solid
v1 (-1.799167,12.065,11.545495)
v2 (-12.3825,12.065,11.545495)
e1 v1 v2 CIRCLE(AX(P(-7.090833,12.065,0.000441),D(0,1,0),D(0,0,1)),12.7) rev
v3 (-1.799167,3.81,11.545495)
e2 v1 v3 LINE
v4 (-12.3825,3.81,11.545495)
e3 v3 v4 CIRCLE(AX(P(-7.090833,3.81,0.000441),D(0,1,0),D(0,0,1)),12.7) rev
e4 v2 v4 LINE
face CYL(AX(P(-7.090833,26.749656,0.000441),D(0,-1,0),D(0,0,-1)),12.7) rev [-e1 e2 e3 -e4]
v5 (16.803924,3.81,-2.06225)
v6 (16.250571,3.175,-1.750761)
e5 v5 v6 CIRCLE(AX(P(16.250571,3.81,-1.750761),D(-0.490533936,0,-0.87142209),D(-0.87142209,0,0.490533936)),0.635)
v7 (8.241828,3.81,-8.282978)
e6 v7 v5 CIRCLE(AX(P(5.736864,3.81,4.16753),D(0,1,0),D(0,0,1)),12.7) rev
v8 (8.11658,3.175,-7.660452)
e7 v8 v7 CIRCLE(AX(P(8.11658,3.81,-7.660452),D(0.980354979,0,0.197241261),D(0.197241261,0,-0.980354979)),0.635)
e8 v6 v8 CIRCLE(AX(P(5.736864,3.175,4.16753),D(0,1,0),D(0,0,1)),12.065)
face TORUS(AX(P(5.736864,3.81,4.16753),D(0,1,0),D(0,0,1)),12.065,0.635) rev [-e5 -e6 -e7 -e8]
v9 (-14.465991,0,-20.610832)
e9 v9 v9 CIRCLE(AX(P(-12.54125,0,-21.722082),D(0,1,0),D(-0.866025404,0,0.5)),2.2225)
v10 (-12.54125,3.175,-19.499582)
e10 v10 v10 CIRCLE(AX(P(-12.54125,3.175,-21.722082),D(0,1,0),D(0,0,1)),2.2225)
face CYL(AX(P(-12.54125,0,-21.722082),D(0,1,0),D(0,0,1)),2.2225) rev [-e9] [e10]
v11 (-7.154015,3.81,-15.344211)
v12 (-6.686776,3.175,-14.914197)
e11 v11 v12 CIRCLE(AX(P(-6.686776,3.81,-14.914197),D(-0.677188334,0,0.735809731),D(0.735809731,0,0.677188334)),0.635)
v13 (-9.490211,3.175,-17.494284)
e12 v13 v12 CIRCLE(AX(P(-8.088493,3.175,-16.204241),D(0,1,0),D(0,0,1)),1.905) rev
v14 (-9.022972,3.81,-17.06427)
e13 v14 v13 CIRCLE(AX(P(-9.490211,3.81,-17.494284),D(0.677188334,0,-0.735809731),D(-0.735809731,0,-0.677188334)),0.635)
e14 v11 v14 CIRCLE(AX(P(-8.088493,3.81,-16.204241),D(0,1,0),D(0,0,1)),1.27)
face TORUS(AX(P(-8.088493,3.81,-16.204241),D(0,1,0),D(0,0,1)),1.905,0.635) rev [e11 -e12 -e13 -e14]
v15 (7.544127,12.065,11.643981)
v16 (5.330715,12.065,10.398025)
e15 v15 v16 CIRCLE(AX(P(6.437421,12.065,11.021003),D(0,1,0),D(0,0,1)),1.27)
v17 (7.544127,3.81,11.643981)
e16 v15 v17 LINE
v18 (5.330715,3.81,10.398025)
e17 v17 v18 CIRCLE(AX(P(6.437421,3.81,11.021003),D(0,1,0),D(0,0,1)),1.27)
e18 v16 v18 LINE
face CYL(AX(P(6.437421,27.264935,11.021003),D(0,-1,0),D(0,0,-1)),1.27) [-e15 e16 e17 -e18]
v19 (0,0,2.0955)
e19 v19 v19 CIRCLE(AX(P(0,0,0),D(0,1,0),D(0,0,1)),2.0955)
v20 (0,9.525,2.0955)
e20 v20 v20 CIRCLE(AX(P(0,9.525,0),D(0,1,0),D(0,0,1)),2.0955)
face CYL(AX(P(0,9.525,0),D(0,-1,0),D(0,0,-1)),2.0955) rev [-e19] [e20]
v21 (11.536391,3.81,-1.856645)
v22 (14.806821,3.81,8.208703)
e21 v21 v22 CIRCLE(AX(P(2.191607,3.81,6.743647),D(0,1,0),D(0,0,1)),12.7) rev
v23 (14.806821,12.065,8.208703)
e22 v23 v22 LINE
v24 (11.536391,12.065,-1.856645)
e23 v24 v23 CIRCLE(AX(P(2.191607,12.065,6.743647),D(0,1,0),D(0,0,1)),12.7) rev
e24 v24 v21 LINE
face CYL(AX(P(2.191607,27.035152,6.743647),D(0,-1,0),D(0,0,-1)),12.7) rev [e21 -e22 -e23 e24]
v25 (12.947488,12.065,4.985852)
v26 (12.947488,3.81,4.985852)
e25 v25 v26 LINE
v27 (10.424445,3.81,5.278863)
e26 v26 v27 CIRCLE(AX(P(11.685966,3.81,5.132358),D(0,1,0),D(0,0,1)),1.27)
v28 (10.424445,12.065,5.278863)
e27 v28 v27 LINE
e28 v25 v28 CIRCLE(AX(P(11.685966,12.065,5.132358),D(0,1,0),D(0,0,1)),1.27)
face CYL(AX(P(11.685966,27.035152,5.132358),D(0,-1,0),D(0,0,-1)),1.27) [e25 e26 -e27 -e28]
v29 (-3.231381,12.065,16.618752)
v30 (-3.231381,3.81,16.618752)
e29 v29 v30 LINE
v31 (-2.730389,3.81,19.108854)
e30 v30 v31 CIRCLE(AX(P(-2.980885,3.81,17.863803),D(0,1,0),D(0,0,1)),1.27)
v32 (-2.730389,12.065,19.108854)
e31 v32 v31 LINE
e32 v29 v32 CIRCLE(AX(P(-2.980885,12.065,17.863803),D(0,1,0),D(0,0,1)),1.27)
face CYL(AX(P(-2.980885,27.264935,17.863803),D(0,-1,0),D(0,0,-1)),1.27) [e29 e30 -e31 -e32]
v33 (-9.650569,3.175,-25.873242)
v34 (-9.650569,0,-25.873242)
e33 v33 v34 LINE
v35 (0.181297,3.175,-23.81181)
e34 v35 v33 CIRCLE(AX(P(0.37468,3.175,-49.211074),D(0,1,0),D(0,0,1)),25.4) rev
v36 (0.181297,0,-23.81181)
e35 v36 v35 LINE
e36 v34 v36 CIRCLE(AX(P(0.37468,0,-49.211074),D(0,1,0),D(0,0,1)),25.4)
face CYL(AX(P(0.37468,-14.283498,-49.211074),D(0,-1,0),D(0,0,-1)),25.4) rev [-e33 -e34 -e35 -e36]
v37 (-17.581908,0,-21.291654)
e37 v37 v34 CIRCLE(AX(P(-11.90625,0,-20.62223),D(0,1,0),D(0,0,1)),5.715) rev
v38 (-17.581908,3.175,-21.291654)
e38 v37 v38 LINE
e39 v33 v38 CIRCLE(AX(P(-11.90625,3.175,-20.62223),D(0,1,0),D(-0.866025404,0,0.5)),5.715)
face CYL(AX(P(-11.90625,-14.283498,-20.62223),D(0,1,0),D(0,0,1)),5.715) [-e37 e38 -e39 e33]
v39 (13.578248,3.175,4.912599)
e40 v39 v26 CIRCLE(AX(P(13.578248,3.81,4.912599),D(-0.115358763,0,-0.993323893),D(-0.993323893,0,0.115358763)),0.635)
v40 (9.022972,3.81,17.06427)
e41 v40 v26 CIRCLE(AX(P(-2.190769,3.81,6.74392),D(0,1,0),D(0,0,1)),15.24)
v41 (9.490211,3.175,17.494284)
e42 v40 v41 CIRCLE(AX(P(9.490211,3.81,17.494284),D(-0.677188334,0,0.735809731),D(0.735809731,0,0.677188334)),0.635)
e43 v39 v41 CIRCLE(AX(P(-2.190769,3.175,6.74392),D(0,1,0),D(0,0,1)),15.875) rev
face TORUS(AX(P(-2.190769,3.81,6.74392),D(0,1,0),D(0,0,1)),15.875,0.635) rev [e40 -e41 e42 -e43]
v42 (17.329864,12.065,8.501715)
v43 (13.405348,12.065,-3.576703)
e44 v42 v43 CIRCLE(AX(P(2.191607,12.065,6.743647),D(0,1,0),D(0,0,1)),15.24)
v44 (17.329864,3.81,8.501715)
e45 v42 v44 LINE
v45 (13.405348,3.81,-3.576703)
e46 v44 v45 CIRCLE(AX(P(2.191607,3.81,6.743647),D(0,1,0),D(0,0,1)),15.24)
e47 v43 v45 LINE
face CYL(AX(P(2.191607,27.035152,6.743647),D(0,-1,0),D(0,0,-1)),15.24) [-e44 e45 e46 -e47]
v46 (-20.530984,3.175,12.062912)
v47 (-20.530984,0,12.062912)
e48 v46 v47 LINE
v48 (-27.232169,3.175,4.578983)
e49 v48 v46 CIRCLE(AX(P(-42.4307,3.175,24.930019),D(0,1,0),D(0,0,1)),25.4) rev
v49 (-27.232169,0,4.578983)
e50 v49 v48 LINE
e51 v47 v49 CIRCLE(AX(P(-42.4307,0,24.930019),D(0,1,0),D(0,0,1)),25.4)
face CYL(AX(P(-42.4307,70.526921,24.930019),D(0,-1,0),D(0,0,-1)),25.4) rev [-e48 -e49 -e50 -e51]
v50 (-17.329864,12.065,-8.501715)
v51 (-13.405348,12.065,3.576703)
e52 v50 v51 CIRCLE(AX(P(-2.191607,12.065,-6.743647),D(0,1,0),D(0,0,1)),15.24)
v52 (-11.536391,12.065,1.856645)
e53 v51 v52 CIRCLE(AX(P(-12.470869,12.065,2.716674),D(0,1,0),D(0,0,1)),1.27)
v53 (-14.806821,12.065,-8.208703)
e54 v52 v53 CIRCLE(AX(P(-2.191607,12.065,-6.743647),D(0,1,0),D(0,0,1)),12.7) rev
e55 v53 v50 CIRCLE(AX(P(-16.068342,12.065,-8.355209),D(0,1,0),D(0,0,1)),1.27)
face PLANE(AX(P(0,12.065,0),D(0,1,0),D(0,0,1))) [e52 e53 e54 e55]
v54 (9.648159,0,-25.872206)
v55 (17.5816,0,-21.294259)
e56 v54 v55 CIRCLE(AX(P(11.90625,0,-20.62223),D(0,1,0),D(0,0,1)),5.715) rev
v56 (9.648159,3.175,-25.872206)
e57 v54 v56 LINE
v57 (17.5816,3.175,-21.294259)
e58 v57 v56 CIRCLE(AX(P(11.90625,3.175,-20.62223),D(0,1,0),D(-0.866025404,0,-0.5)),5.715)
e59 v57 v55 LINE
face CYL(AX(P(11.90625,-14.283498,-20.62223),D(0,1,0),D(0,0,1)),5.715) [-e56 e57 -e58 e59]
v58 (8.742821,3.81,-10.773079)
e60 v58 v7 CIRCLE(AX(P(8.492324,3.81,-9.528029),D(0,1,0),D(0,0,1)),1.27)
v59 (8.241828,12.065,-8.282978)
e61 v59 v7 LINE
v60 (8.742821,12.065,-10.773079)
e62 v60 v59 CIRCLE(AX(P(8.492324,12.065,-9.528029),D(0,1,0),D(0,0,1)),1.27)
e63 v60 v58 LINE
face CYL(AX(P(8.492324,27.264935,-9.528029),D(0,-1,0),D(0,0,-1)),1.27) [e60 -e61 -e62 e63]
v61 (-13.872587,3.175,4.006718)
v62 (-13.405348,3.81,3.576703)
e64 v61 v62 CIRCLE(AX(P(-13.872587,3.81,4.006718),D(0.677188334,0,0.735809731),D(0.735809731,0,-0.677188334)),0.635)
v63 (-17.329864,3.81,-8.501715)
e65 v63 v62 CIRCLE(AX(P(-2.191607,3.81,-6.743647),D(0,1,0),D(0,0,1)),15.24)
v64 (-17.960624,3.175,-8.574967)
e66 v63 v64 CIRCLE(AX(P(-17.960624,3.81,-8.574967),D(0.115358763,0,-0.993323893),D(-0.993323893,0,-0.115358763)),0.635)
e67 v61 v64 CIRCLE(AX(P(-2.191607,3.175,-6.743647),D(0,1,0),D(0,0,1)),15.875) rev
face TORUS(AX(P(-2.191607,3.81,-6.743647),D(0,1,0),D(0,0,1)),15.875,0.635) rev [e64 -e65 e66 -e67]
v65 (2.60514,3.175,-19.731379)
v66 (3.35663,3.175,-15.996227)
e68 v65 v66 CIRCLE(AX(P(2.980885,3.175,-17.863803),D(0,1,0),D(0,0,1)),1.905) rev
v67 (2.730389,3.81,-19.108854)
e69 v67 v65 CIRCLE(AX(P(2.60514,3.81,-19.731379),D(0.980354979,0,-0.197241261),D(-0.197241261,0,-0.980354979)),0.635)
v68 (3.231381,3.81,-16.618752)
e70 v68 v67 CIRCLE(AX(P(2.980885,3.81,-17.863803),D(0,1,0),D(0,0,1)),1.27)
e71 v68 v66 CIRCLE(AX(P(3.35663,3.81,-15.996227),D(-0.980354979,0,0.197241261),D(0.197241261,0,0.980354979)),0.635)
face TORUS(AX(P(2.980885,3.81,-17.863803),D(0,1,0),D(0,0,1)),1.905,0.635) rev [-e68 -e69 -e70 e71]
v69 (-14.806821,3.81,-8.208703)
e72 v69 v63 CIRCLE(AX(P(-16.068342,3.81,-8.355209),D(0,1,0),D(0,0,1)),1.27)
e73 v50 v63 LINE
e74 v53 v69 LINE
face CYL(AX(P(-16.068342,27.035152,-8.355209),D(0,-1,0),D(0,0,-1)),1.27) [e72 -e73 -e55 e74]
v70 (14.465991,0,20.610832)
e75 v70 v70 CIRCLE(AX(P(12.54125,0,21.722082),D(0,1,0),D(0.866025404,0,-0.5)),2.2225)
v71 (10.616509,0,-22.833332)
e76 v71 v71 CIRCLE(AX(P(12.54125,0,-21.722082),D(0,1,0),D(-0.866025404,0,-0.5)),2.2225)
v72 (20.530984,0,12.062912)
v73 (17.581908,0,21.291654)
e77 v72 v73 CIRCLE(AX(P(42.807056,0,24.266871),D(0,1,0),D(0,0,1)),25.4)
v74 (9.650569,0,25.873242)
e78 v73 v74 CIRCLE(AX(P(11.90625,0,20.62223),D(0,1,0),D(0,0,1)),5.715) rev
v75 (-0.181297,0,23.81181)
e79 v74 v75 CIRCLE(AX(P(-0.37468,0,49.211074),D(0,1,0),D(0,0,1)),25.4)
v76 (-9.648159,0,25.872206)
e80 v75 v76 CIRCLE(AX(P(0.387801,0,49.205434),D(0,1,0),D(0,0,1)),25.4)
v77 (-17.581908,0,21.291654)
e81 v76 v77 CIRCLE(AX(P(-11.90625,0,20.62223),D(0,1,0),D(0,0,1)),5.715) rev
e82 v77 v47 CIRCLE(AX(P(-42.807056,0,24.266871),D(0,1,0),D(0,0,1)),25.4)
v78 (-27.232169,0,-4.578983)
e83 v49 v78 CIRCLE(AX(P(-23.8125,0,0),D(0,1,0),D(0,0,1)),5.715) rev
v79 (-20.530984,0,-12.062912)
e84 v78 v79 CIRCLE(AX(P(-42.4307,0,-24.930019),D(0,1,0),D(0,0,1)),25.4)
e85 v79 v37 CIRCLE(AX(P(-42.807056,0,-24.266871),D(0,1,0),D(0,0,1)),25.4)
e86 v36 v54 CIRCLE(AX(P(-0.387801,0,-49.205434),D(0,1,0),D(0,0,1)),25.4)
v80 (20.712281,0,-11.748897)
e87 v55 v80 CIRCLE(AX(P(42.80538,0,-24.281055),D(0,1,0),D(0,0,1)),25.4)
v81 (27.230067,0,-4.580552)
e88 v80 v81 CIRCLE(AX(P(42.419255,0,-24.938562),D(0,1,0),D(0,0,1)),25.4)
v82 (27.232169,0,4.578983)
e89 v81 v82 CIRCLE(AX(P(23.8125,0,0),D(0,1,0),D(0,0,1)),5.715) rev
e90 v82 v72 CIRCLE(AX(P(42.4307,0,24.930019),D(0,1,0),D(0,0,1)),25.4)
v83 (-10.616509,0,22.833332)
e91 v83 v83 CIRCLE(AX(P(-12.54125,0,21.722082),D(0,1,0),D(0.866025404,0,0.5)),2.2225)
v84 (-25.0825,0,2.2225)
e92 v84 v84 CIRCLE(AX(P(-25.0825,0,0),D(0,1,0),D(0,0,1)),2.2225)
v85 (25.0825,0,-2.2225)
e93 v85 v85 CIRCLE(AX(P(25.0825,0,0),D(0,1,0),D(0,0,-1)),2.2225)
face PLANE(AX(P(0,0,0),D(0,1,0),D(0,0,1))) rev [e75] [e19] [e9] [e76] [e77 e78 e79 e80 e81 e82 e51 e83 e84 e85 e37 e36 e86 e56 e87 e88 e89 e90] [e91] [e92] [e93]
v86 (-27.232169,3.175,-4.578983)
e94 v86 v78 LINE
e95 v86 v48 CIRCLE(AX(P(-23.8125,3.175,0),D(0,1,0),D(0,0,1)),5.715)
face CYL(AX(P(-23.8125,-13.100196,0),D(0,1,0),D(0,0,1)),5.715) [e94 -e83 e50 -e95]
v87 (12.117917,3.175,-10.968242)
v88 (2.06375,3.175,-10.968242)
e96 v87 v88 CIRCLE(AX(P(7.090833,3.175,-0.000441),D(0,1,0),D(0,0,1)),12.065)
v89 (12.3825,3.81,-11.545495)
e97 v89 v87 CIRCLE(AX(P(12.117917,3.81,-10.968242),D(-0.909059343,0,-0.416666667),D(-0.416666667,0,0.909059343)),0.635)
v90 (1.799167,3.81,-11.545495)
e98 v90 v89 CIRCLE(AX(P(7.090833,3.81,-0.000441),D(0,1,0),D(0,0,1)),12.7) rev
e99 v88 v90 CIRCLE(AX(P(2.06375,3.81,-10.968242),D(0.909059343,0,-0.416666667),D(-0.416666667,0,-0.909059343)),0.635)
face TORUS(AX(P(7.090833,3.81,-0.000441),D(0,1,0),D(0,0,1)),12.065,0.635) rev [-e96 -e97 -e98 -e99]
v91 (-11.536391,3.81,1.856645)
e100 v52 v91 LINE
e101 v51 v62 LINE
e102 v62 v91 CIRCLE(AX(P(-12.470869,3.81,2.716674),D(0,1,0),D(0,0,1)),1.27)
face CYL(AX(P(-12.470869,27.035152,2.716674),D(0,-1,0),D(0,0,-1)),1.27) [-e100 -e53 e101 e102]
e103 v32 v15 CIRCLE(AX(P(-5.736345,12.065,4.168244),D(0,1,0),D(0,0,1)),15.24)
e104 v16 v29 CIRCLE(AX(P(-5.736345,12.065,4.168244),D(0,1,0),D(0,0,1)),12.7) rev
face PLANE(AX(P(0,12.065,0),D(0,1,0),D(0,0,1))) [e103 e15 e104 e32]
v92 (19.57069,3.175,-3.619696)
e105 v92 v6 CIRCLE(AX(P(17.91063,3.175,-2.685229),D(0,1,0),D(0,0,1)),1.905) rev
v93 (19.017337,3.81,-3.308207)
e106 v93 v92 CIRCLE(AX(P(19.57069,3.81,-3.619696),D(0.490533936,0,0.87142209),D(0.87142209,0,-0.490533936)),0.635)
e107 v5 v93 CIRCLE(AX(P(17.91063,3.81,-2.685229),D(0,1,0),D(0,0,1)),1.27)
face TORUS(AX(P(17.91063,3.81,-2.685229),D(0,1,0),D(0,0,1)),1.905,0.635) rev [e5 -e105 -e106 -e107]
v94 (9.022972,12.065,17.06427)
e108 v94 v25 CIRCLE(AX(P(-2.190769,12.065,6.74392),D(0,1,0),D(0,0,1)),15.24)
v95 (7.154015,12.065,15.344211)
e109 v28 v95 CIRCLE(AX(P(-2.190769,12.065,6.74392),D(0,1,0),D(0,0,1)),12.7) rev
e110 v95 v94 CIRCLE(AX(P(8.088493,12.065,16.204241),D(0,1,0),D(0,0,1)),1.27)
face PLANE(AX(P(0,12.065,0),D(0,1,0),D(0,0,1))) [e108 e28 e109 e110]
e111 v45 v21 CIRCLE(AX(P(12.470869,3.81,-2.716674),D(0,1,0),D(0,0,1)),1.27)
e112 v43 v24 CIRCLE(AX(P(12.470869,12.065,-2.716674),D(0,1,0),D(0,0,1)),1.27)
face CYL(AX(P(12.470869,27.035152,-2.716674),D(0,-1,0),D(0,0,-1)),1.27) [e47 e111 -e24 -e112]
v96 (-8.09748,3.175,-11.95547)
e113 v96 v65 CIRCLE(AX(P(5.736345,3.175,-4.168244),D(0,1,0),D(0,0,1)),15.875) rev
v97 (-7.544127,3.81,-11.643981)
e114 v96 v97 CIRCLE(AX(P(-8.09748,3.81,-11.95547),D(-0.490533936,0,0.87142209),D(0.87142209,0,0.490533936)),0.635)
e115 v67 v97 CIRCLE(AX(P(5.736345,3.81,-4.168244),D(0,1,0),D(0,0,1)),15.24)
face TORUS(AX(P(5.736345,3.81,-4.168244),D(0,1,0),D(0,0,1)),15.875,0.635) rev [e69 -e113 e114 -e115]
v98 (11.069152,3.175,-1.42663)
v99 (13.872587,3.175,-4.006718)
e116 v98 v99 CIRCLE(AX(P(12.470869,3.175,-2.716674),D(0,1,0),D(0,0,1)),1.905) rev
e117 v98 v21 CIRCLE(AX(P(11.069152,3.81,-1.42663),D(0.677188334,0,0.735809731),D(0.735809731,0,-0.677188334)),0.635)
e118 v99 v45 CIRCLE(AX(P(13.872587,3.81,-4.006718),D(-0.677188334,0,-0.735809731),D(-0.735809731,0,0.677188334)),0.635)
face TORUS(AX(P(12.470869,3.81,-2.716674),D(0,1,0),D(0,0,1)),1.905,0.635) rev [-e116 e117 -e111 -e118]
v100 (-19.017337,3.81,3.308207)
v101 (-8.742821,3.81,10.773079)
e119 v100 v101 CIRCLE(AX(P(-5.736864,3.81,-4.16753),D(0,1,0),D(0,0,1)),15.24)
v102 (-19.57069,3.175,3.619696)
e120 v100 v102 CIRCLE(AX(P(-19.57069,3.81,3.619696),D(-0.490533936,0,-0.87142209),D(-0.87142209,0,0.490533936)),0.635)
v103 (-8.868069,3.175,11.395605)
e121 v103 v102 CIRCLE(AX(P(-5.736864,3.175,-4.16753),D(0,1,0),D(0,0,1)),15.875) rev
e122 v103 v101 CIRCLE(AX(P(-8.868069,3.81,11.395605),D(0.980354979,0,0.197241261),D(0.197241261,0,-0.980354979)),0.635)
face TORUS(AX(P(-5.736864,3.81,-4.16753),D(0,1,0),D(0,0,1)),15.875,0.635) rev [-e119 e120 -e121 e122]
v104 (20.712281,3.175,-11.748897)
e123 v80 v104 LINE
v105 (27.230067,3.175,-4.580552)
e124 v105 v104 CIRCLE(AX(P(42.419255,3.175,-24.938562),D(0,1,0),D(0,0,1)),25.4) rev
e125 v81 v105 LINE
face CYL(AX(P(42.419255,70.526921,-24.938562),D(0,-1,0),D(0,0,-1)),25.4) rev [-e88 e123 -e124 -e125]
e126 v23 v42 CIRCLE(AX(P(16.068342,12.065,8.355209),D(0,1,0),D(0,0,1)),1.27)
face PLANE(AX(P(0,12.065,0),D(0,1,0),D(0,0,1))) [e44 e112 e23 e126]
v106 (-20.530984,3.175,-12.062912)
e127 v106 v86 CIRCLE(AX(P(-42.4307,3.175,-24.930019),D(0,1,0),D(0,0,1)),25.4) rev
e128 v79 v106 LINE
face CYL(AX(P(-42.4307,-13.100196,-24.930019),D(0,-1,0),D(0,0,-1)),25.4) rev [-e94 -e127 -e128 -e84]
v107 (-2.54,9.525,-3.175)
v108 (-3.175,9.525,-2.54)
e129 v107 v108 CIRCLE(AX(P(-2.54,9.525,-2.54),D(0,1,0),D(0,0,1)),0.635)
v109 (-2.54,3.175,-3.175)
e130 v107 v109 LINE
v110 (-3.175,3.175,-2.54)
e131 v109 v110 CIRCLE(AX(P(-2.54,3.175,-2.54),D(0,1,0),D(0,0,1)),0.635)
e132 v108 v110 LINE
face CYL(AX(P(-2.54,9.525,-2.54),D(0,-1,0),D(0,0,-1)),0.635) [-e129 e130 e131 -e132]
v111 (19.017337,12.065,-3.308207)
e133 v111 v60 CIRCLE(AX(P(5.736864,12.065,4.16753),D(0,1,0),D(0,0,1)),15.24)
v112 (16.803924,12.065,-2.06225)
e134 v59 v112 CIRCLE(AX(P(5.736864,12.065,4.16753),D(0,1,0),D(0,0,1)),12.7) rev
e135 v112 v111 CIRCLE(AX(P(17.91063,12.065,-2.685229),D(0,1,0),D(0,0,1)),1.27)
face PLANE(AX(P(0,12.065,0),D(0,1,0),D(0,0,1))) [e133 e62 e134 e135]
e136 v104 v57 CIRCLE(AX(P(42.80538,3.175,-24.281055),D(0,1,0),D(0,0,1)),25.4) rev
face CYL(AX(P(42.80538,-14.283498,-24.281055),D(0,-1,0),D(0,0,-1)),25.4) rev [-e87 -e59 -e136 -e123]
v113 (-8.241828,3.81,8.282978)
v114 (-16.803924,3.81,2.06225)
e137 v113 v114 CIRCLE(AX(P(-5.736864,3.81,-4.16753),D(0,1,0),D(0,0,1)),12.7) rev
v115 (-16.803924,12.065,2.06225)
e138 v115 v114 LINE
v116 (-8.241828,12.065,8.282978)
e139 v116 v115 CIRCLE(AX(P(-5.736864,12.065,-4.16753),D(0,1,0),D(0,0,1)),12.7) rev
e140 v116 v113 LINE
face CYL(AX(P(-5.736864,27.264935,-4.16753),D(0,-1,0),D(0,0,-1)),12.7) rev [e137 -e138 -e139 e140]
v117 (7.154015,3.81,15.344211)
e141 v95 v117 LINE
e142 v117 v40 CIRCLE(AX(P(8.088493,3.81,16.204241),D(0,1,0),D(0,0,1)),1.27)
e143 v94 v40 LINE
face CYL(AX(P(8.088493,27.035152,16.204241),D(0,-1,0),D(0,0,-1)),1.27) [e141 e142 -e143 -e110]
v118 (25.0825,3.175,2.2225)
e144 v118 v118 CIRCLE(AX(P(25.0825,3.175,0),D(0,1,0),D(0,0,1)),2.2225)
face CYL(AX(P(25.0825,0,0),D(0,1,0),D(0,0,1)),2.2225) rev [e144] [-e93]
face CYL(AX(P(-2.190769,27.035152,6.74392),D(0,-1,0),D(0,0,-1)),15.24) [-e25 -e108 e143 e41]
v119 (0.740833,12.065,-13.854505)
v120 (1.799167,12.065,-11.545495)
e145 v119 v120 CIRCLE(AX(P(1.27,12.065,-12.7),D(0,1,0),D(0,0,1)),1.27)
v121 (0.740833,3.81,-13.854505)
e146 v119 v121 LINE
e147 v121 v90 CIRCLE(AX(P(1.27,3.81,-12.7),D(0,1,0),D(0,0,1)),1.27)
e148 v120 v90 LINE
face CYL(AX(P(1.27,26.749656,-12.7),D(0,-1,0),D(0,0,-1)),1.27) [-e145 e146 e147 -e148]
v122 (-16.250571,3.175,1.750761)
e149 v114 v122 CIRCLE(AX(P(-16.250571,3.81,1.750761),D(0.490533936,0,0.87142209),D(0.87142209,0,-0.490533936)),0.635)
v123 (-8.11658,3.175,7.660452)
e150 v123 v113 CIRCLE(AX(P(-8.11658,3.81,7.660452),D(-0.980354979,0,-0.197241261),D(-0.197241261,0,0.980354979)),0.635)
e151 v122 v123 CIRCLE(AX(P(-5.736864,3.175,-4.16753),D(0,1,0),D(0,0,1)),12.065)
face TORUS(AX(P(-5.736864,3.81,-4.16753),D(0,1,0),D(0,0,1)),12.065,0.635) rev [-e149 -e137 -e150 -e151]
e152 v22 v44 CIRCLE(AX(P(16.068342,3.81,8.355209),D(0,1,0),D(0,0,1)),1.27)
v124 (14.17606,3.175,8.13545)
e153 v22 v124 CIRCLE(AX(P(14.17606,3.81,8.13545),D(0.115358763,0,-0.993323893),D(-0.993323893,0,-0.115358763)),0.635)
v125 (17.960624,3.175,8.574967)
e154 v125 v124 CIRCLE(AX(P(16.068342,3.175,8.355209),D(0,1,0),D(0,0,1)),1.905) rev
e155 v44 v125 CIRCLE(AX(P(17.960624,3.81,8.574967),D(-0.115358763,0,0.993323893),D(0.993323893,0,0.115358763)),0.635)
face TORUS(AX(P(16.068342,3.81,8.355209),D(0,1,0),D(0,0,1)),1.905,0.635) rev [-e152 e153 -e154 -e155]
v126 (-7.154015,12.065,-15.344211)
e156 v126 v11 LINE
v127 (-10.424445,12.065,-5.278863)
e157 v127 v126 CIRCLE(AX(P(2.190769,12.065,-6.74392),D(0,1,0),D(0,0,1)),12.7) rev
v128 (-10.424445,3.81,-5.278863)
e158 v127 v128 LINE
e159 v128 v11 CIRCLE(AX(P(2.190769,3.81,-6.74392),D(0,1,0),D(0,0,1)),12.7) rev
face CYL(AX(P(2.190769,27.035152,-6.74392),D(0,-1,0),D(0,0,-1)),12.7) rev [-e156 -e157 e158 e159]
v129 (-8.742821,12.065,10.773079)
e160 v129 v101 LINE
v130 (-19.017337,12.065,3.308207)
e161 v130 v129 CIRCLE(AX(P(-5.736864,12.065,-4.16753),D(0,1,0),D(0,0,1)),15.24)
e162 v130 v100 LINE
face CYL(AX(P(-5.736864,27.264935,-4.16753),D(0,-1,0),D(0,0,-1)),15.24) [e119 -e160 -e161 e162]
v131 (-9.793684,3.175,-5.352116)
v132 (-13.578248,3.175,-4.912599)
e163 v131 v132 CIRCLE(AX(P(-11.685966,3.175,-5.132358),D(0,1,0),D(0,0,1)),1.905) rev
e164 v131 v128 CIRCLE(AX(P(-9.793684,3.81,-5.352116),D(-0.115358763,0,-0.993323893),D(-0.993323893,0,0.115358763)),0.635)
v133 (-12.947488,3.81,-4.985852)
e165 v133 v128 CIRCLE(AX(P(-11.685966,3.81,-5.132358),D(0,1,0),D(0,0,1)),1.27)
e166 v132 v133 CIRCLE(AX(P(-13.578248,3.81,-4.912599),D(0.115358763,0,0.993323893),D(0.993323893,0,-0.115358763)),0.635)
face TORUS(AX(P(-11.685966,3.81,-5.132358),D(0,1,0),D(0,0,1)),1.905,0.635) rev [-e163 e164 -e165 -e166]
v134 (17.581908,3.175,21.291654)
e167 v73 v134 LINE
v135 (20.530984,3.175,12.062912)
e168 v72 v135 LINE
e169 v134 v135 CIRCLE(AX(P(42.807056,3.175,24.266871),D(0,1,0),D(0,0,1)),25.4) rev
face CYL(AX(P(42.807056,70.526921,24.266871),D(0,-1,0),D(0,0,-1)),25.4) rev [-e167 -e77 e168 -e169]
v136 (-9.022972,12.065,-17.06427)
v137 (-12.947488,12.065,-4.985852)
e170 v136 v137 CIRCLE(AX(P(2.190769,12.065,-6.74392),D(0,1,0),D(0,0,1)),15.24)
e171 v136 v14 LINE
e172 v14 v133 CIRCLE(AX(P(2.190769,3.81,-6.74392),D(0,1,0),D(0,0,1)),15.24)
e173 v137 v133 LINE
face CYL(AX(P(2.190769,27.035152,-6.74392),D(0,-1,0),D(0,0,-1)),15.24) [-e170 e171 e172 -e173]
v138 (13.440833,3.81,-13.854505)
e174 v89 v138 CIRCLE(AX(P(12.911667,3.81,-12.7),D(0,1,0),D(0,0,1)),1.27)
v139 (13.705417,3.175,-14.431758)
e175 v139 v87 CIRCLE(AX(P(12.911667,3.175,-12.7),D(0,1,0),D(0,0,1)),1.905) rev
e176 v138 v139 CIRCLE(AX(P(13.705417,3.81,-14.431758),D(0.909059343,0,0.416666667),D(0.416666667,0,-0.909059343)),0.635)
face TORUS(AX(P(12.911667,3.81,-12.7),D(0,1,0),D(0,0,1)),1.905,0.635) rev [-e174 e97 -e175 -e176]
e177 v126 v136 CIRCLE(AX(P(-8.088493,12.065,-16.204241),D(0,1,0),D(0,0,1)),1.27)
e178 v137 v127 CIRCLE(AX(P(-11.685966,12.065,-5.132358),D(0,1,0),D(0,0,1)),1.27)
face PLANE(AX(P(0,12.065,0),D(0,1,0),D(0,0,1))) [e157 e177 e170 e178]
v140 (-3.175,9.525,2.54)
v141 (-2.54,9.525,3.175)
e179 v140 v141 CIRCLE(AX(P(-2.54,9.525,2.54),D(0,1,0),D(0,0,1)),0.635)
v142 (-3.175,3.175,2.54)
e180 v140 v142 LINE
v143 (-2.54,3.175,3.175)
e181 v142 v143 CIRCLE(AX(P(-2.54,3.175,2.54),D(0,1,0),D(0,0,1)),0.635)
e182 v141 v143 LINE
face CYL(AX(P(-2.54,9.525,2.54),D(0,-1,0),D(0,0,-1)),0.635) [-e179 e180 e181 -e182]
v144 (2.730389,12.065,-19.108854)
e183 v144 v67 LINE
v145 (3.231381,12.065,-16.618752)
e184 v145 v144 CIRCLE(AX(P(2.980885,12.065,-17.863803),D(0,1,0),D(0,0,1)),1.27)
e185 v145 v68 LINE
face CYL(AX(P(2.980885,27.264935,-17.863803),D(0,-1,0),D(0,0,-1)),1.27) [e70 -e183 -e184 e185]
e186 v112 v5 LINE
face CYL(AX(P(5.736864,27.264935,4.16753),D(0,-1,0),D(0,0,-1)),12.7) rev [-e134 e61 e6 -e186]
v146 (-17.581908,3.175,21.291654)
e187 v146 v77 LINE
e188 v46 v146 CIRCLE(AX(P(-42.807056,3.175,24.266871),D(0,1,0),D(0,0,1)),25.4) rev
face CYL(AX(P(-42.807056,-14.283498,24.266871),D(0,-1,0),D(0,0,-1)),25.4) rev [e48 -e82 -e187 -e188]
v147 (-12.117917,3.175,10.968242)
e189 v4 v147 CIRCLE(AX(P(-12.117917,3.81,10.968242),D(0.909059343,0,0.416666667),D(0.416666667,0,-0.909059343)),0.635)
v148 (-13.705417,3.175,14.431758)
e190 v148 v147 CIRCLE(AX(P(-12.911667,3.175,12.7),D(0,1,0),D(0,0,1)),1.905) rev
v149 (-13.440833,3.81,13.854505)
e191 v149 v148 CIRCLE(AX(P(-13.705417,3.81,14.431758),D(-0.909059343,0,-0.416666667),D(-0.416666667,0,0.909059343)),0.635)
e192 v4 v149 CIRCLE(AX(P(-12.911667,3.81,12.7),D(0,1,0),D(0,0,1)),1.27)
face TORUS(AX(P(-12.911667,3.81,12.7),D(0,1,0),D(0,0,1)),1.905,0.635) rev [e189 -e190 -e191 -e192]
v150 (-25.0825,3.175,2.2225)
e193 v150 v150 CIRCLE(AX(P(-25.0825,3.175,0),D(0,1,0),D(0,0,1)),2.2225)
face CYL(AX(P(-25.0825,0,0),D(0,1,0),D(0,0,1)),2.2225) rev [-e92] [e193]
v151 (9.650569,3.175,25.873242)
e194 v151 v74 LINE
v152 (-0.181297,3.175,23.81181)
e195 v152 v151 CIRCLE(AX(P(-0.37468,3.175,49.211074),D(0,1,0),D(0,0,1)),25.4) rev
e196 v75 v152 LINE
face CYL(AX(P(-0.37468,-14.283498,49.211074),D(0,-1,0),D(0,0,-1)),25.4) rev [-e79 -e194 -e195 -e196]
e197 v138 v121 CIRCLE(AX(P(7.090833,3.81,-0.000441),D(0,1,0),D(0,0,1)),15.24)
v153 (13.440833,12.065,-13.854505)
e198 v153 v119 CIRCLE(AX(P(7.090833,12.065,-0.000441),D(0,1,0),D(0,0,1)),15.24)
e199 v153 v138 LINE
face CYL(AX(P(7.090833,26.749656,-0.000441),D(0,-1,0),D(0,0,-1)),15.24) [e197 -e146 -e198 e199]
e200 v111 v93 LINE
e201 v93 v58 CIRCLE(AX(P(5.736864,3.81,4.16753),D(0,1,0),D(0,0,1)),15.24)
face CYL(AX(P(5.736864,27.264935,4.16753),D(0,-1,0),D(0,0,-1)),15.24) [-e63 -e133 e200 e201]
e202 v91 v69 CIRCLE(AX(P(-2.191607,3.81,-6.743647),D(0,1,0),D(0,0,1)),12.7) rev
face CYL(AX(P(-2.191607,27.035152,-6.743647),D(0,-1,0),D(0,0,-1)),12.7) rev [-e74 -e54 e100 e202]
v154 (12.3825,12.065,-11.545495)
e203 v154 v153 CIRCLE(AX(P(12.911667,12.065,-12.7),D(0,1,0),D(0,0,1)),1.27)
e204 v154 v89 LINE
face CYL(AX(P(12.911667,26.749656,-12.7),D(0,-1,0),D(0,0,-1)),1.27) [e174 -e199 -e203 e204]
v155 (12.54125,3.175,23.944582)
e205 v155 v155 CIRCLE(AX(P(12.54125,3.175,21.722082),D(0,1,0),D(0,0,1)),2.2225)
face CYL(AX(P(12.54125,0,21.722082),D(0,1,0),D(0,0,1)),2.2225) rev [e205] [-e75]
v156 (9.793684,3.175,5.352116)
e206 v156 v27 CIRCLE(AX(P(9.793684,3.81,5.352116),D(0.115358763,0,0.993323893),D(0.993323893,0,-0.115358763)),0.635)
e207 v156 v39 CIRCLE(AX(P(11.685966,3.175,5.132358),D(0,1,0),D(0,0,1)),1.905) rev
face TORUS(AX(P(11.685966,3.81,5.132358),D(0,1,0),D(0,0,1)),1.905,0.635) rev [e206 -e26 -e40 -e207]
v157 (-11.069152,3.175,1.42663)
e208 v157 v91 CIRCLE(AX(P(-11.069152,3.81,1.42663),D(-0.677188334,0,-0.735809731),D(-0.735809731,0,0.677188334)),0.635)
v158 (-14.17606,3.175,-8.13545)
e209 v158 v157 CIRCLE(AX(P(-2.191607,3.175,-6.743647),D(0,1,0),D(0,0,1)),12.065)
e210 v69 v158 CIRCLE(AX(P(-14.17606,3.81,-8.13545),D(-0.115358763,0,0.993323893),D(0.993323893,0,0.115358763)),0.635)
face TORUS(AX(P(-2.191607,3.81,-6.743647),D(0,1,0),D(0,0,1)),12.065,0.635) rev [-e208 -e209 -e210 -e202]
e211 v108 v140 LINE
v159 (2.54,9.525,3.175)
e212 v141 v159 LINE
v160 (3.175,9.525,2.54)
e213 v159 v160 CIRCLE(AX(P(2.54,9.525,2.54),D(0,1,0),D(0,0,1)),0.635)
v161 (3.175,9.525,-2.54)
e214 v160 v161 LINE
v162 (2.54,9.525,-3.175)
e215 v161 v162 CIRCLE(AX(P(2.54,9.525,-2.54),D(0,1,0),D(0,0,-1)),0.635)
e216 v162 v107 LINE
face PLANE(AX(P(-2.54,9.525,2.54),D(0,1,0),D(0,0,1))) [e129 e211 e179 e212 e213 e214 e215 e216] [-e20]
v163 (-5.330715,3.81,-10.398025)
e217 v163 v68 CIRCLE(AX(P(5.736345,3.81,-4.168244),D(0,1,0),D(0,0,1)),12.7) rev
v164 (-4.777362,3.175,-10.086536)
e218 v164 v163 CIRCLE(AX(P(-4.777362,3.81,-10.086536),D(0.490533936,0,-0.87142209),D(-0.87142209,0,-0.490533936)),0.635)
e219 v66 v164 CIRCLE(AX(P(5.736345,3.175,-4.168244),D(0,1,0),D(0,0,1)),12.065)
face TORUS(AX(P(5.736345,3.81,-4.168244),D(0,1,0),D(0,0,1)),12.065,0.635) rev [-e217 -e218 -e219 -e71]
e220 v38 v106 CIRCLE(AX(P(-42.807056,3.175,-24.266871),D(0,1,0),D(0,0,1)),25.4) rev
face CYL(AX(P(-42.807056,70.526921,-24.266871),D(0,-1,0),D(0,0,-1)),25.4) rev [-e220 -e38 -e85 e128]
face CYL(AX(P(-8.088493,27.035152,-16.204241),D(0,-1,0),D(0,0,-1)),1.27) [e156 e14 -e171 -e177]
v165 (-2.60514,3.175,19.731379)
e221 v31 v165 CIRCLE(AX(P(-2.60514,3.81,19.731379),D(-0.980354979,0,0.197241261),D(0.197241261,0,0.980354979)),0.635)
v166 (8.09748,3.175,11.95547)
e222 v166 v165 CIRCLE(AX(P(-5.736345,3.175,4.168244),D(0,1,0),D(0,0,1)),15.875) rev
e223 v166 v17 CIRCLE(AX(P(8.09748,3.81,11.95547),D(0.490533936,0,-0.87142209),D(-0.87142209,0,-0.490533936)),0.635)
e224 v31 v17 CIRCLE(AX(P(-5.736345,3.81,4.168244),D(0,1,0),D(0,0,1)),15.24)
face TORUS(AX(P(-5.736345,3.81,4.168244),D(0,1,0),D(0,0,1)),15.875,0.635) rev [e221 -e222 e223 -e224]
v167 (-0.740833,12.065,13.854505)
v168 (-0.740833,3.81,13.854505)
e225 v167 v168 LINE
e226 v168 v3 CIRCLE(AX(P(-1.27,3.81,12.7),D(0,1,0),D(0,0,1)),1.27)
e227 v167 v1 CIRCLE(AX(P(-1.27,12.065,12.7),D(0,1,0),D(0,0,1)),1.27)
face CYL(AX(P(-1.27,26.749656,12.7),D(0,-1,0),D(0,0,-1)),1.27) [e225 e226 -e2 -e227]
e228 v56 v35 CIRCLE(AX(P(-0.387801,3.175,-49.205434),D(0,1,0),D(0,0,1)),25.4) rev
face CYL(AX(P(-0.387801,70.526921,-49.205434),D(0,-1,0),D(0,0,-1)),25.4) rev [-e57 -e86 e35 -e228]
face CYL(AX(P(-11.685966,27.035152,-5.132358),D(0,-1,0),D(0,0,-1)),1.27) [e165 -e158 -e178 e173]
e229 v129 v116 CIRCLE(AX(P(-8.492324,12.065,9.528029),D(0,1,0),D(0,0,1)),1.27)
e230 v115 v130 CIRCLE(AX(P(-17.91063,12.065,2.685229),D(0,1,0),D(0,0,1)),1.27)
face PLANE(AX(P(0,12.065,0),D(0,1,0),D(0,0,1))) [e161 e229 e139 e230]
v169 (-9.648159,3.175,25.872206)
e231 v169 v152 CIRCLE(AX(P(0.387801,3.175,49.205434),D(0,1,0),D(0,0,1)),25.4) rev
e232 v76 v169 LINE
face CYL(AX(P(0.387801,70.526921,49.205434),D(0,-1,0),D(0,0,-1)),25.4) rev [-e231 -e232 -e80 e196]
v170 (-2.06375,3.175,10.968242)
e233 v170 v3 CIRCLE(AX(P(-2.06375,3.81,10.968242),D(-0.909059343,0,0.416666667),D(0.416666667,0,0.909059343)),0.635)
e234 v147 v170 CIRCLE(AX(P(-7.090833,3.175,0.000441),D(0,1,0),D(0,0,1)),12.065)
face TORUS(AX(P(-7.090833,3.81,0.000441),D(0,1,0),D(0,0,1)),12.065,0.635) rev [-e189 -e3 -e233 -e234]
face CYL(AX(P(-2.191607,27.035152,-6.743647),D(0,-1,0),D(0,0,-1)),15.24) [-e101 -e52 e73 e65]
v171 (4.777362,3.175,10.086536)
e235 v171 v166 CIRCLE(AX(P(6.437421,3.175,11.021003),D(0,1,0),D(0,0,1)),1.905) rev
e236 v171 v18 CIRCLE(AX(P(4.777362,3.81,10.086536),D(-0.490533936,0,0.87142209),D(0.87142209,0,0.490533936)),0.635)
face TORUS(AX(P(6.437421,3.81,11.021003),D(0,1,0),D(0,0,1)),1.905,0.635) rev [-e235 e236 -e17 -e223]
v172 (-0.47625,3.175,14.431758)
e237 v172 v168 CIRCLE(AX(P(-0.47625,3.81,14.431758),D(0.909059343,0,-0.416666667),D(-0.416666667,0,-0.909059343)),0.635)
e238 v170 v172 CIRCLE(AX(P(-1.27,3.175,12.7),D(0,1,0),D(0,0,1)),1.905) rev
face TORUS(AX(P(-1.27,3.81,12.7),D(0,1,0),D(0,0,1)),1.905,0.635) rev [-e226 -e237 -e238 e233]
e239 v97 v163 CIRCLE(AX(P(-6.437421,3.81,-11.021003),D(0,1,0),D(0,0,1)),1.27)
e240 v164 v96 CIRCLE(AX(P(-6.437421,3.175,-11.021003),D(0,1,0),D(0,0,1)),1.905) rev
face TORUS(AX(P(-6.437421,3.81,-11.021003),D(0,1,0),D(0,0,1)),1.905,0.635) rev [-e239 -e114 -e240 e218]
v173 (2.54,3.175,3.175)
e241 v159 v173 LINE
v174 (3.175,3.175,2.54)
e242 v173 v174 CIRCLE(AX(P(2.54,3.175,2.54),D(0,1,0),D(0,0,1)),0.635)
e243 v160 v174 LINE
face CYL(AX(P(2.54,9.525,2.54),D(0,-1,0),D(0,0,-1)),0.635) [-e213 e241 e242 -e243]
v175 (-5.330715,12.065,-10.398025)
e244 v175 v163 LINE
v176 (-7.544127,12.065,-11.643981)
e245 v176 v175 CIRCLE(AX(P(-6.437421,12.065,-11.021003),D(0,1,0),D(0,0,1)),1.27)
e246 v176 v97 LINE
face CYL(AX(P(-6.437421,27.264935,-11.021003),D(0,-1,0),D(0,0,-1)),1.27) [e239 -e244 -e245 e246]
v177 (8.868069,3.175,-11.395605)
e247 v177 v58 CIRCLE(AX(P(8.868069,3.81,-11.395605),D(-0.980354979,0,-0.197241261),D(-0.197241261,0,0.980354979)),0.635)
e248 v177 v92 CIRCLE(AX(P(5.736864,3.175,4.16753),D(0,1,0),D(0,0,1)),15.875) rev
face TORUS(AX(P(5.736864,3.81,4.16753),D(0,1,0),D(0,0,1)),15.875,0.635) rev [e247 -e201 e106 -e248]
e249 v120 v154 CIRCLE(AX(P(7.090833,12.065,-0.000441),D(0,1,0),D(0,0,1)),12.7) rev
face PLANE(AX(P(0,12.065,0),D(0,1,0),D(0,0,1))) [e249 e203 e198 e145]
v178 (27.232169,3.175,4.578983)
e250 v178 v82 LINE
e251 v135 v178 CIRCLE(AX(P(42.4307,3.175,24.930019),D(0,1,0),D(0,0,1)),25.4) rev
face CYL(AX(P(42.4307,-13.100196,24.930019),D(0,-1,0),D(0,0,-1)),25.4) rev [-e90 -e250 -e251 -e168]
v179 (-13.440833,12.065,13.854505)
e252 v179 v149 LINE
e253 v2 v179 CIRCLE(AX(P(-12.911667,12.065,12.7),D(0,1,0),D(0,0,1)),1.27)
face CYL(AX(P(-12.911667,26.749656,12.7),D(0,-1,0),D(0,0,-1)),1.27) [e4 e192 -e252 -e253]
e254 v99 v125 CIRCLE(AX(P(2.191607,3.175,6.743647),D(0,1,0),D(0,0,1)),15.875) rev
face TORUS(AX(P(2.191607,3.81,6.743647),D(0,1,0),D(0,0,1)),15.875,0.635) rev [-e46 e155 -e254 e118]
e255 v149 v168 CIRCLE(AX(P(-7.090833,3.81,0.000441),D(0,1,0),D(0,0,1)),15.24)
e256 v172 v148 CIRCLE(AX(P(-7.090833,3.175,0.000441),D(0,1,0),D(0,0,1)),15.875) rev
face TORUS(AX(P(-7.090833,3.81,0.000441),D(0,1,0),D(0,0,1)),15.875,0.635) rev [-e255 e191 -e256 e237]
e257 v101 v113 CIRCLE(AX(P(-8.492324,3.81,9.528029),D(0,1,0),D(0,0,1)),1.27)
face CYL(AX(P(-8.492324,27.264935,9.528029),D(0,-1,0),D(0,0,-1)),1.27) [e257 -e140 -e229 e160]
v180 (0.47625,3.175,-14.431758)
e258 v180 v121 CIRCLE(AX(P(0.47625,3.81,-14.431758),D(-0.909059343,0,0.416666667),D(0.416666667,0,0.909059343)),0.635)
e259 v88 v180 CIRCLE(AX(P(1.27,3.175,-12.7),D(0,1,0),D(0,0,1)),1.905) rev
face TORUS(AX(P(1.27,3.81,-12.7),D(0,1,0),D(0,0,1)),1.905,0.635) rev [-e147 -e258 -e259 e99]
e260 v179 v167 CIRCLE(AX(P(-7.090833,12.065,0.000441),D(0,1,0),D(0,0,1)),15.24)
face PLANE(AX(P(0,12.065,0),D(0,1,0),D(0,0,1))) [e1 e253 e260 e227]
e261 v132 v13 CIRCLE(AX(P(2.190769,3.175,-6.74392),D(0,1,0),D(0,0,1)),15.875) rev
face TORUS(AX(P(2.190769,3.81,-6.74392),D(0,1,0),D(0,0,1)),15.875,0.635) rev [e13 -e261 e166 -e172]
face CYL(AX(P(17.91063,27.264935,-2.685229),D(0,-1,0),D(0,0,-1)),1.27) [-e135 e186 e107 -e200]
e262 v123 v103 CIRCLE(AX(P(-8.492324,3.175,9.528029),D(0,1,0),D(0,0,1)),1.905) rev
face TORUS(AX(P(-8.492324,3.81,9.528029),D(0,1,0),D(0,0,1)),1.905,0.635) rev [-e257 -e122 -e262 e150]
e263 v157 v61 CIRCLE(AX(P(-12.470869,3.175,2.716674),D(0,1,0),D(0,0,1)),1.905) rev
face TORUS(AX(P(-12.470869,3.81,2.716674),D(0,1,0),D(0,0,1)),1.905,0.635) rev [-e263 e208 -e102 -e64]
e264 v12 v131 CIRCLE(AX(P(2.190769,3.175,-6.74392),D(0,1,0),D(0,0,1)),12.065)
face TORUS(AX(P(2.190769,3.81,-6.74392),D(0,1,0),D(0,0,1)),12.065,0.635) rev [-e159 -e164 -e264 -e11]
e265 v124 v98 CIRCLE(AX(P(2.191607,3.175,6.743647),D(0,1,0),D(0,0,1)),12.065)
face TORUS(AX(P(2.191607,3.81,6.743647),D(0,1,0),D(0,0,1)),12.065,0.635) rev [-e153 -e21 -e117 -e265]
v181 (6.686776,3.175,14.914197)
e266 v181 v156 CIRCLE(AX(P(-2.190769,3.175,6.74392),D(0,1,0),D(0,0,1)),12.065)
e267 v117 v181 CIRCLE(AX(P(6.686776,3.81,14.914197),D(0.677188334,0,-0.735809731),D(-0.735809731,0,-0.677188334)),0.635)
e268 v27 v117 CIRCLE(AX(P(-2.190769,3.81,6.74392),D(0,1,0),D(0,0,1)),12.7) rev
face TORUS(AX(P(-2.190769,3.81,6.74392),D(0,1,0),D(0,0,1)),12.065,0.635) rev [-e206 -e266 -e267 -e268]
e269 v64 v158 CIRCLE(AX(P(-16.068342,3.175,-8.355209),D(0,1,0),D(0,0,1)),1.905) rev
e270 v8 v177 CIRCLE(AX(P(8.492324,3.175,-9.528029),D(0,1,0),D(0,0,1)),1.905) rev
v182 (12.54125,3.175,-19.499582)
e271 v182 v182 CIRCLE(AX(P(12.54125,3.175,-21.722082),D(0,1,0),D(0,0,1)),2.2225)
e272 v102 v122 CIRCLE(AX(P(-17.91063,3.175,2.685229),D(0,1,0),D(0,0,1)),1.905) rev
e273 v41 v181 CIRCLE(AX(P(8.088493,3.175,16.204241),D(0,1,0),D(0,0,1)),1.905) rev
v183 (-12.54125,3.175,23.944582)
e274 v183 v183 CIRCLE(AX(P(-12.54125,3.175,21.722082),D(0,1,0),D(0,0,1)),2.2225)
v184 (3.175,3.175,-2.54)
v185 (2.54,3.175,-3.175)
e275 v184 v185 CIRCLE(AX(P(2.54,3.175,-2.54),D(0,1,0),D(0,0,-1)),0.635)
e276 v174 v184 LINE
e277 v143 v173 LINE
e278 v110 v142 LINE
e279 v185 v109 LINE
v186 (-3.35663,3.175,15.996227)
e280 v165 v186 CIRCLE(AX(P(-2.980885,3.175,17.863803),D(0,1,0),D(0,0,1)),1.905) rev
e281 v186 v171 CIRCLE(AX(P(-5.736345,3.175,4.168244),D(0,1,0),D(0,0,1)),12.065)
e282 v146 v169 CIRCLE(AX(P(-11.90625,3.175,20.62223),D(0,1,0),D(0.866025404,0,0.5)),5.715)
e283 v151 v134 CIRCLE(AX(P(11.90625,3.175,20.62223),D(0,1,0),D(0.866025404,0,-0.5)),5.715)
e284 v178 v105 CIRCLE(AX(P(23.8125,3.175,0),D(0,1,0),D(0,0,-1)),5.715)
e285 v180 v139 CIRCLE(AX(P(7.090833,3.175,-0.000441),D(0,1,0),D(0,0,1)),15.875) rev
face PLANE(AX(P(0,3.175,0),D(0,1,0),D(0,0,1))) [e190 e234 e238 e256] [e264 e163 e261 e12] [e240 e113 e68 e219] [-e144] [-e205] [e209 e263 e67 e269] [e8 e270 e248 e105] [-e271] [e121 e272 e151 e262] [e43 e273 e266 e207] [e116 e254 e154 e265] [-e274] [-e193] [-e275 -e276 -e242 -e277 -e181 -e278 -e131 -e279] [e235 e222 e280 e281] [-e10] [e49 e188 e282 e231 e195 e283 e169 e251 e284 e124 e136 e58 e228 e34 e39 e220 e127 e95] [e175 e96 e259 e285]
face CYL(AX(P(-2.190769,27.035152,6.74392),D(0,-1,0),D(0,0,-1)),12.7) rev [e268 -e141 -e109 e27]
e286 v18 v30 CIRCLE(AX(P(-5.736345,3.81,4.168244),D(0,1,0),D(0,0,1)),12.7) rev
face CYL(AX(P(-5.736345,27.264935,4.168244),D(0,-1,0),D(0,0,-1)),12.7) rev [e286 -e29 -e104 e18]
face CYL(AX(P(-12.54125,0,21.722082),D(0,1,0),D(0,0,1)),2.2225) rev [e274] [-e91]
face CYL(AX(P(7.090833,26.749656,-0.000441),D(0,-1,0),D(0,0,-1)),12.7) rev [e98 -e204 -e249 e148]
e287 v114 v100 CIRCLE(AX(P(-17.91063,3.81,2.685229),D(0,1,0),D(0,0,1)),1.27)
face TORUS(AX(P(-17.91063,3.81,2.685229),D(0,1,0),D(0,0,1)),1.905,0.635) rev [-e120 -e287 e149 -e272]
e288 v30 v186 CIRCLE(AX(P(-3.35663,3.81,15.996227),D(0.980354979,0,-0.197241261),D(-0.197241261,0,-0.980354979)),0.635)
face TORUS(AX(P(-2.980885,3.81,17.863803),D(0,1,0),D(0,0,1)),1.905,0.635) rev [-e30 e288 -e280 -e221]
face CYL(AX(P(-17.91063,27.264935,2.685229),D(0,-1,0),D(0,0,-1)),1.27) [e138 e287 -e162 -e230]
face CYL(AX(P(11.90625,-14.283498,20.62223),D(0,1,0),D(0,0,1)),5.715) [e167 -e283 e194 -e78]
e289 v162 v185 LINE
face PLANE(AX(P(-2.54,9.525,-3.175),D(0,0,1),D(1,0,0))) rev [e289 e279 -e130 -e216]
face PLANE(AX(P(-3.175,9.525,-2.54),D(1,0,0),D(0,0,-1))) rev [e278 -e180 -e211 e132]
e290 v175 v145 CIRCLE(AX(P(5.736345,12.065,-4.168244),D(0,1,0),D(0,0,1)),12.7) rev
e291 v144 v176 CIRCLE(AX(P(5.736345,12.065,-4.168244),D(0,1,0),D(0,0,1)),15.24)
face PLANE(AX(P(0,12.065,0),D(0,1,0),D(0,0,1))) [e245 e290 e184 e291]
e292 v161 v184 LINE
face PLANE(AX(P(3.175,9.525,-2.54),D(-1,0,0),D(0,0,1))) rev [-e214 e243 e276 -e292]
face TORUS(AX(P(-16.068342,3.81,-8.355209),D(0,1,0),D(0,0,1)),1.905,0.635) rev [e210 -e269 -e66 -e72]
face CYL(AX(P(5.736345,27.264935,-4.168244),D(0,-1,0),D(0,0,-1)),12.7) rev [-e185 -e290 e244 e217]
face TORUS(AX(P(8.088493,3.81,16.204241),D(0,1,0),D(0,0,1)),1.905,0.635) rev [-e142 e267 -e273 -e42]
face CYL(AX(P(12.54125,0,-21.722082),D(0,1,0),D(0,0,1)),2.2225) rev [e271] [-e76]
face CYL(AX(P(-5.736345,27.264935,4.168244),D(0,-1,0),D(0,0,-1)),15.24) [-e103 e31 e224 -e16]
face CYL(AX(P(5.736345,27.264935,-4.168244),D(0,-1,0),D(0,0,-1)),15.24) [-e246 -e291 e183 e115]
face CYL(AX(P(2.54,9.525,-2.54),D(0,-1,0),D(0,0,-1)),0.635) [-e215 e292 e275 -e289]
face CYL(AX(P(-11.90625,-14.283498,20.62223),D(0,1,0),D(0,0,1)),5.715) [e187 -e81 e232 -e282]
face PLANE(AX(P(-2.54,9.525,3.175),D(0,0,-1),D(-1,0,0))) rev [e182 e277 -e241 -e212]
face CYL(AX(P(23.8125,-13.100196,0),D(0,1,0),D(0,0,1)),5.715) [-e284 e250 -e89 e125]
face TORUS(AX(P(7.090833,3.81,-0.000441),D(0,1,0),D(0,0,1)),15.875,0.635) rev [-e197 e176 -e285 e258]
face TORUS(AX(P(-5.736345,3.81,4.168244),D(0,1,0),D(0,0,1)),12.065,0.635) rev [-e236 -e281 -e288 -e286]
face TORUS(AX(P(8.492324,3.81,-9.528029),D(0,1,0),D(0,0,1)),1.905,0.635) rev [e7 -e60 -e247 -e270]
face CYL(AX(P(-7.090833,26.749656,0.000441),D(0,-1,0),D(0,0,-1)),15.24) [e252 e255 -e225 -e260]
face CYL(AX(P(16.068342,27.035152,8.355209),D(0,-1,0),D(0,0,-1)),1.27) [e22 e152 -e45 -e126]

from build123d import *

# Parameters (mm, degrees)
SKETCH1_R                = 20.6375
BOSS_EXTRUDE1_DEPTH      = 3.175
SKETCH2_R                = 23.8125
SKETCH2_R_2              = 20.6375
BOSS_EXTRUDE2_DEPTH      = 3.175
SKETCH4_R                = 2.0955
BOSS_EXTRUDE3_DEPTH      = 6.35
CUT_EXTRUDE1_DEPTH       = 35.269415118
CUT_EXTRUDE1_DEPTH_BACK  = 35.269415118
SKETCH5_R                = 2.0955
BOSS_EXTRUDE4_DEPTH      = 8.89
FILLET1_R                = 0.635
CIRPATTERN1_COUNT        = 10
FILLET1_OF_CIRPATTERN1_R = 0.635
BOSS_EXTRUDE6_START      = -3.175
BOSS_EXTRUDE6_DEPTH      = 3.175
FILLET4_R                = 25.4
SKETCH9_R                = 2.2225
CUT_EXTRUDE2_DEPTH       = 39.960756193
CIRPATTERN3_DEPTH        = 3.175
CIRPATTERN3_2_DEPTH      = 3.175


# Read off the part's stored shape, not the designer's step: CirPattern3
with BuildPart() as part:
    # Sketch1 → Boss-Extrude1 (new body)
    with BuildSketch(Plane(origin=(0, 0, 0), x_dir=(1, 0, 0), z_dir=(0, 1, 0))):
        with Locations(Location((0, 0, 0), (0, 0, 270))):
            Circle(SKETCH1_R)
    extrude(amount=BOSS_EXTRUDE1_DEPTH)

    # Sketch2 → Boss-Extrude2 (add)
    with BuildSketch(Plane(origin=(0, 0, 0), x_dir=(-1, 0, 0), z_dir=(0, -1, 0))):
        with Locations(Location((0, 0, 0), (0, 0, 90))):
            Circle(SKETCH2_R)
        Circle(SKETCH2_R_2, mode=Mode.SUBTRACT)
    extrude(amount=-BOSS_EXTRUDE2_DEPTH)

    # Sketch4 → Boss-Extrude3 (add)
    with BuildSketch(Plane(origin=(0, 3.175, 0), x_dir=(1, 0, 0), z_dir=(0, 1, 0))):
        with BuildLine():
            Line((-2.54, 3.175), (2.54, 3.175))
            ThreePointArc((2.54, 3.175), (2.989012806, 2.989012806), (3.175, 2.54))
            Line((3.175, 2.54), (3.175, -2.54))
            ThreePointArc((3.175, -2.54), (2.989012806, -2.989012806), (2.54, -3.175))
            Line((2.54, -3.175), (-2.54, -3.175))
            ThreePointArc((-2.54, -3.175), (-2.989012806, -2.989012806), (-3.175, -2.54))
            Line((-3.175, -2.54), (-3.175, 2.54))
            ThreePointArc((-3.175, 2.54), (-2.989012806, 2.989012806), (-2.54, 3.175))
        make_face()
        with Locations(Location((0, 0, 0), (0, 0, 270))):
            Circle(SKETCH4_R, mode=Mode.SUBTRACT)
    extrude(amount=BOSS_EXTRUDE3_DEPTH)

    # Sketch5 → Cut-Extrude1 (cut, two sides: drawn at the far end of the back side and taken through both)
    with BuildSketch(Plane(origin=(0, 3.175, 0), x_dir=(1, 0, 0), z_dir=(0, 1, 0)).offset(-CUT_EXTRUDE1_DEPTH_BACK)):
        with Locations(Location((0, 0, 0), (0, 0, 270))):
            Circle(SKETCH5_R)
    extrude(amount=CUT_EXTRUDE1_DEPTH + CUT_EXTRUDE1_DEPTH_BACK, mode=Mode.SUBTRACT)

    # Sketch6 → Boss-Extrude4 (add)
    with BuildSketch(Plane(origin=(0, 3.175, 0), x_dir=(1, 0, 0), z_dir=(0, 1, 0))):
        with BuildLine():
            ThreePointArc((-7.544127175, 11.643981197), (-3.221501775, 16.497663014), (2.730388654, 19.108853901))
            ThreePointArc((2.730388654, 19.108853901), (4.225935878, 18.114299479), (3.231381456, 16.618752254))
            ThreePointArc((3.231381456, 16.618752254), (-1.728527235, 14.442759849), (-5.330715068, 10.398025001))
            ThreePointArc((-5.330715068, 10.398025001), (-7.060399219, 9.914297045), (-7.544127175, 11.643981197))
        make_face()
    boss_extrude4 = extrude(amount=BOSS_EXTRUDE4_DEPTH)

    # Fillet1
    fillet1_edges = [part.edges().sort_by_distance(p)[0] for p in [
        (-7.060399219, 3.175, -9.914297045),
        (-1.728527235, 3.175, -14.442759849),
        (4.225935878, 3.175, -18.114299479),
        (-3.221501775, 3.175, -16.497663014),
    ]]
    fillet(fillet1_edges, radius=FILLET1_R)

    # CirPattern1: Boss-Extrude4 ×10 about axis
    cirpattern1_axis = Axis((0, 0, 0), (0, 1, 0))
    for i in range(1, CIRPATTERN1_COUNT):
        add(boss_extrude4.rotate(cirpattern1_axis, i * 360 / CIRPATTERN1_COUNT))

    # Fillet1 of CirPattern1
    fillet1_of_cirpattern1_edges = [part.edges().sort_by_distance(p)[0] for p in [
        (-11.539460546, 3.175, -3.87083626),
        (-9.887649149, 3.175, -10.668435346),
        (-7.228464147, 3.175, -17.138718906),
        (-12.303332701, 3.175, -11.453338512),
        (-11.610840155, 3.175, 3.651152411),
        (-14.270025158, 3.175, -2.819131149),
        (-15.921836554, 3.175, -9.616730235),
        (-16.685708709, 3.175, -2.034227983),
        (-7.247273464, 3.175, 9.778524959),
        (-13.201736577, 3.175, 6.106985329),
        (-18.533608561, 3.175, 1.578522526),
        (-14.694711117, 3.175, 8.161888495),
        (-0.115494635, 3.175, 12.170833333),
        (-7.090833333, 3.175, 12.70044098),
        (-14.066172032, 3.175, 12.170833333),
        (-7.090833333, 3.175, 15.24044098),
        (7.060399219, 3.175, 9.914297045),
        (1.728527235, 3.175, 14.442759849),
        (-4.225935878, 3.175, 18.114299479),
        (3.221501775, 3.175, 16.497663014),
        (11.539460546, 3.175, 3.87083626),
        (9.887649149, 3.175, 10.668435346),
        (7.228464147, 3.175, 17.138718906),
        (12.303332701, 3.175, 11.453338512),
        (11.610840155, 3.175, -3.651152411),
        (14.270025158, 3.175, 2.819131149),
        (15.921836554, 3.175, 9.616730235),
        (16.685708709, 3.175, 2.034227983),
        (7.247273464, 3.175, -9.778524959),
        (13.201736577, 3.175, -6.106985329),
        (18.533608561, 3.175, -1.578522526),
        (14.694711117, 3.175, -8.161888495),
        (0.115494635, 3.175, -12.170833333),
        (7.090833333, 3.175, -12.70044098),
        (14.066172032, 3.175, -12.170833333),
        (7.090833333, 3.175, -15.24044098),
    ]]
    fillet(fillet1_of_cirpattern1_edges, radius=FILLET1_OF_CIRPATTERN1_R)

    # Sketch8 → Boss-Extrude6 (add)
    with BuildSketch(Plane(origin=(0, 3.175, 0), x_dir=(1, 0, 0), z_dir=(0, 1, 0)).offset(BOSS_EXTRUDE6_START)):
        with BuildLine():
            ThreePointArc((-23.1267, 5.673702791), (-29.5275, 0), (-23.1267, -5.673702791))
            ThreePointArc((-23.1267, -5.673702791), (-23.8125, 0), (-23.1267, 5.673702791))
        make_face()
    extrude(amount=BOSS_EXTRUDE6_DEPTH)

    # Fillet4
    fillet4_edges = [part.edges().sort_by_distance(p)[0] for p in [
        (-23.1267, 1.5875, -5.673702791),
        (-23.1267, 1.5875, 5.673702791),
    ]]
    fillet(fillet4_edges, radius=FILLET4_R)

    # Sketch9 → Cut-Extrude2 (cut, symmetric)
    with BuildSketch(Plane(origin=(0, 3.175, 0), x_dir=(1, 0, 0), z_dir=(0, 1, 0))):
        with Locations(Location((-25.0825, 0, 0), (0, 0, 270))):
            Circle(SKETCH9_R)
    extrude(amount=CUT_EXTRUDE2_DEPTH, both=True, mode=Mode.SUBTRACT)

    # CirPattern3 outline → CirPattern3 (cut)
    with BuildSketch(Plane(origin=(0, 0, 0), x_dir=(1, 0, 0), z_dir=(0, 1, 0))):
        with BuildLine():
            ThreePointArc((-13.411056221, 19.676857658), (-11.43, 19.79734073), (-10.335130488, 21.452744208))
            ThreePointArc((-10.335130488, 21.452744208), (-11.90625, 20.622229928), (-13.411056221, 19.676857658))
        make_face()
        with BuildLine():
            ThreePointArc((13.411056221, 19.676857658), (11.90625, 20.622229928), (10.335130488, 21.452744208))
            ThreePointArc((10.335130488, 21.452744208), (11.43, 19.79734073), (13.411056221, 19.676857658))
        make_face()
        with BuildLine():
            ThreePointArc((23.746186709, -1.77588655), (23.8125, 0), (23.746186709, 1.77588655))
            ThreePointArc((23.746186709, 1.77588655), (22.86, 0), (23.746186709, -1.77588655))
        make_face()
        with BuildLine():
            ThreePointArc((10.335130488, -21.452744208), (11.90625, -20.622229928), (13.411056221, -19.676857658))
            ThreePointArc((13.411056221, -19.676857658), (11.43, -19.79734073), (10.335130488, -21.452744208))
        make_face()
        with BuildLine():
            ThreePointArc((-13.411056221, -19.676857658), (-11.90625, -20.622229928), (-10.335130488, -21.452744208))
            ThreePointArc((-10.335130488, -21.452744208), (-11.43, -19.79734073), (-13.411056221, -19.676857658))
        make_face()
    extrude(amount=CIRPATTERN3_DEPTH, mode=Mode.SUBTRACT)

    # CirPattern3 2 outline → CirPattern3 2 (add)
    with BuildSketch(Plane(origin=(0, 0, 0), x_dir=(1, 0, 0), z_dir=(0, 1, 0))):
        with BuildLine():
            ThreePointArc((0.181296717, 23.811809838), (-4.837563965, 24.35161844), (-9.650569001, 25.873242043))
            ThreePointArc((-9.650569001, 25.873242043), (-14.764885819, 25.570909171), (-17.581908256, 21.29165383))
            ThreePointArc((-17.581908256, 21.29165383), (-18.612348128, 16.535370154), (-20.530983871, 12.062912482))
            ThreePointArc((-20.530983871, 12.062912482), (-17.392773261, 16.264273564), (-13.411056221, 19.676857658))
            ThreePointArc((-13.411056221, 19.676857658), (-13.6525, 23.64682365), (-10.335130488, 21.452744208))
            ThreePointArc((-10.335130488, 21.452744208), (-5.212138018, 23.235076362), (0.181296717, 23.811809838))
        make_face()
        with BuildLine():
            ThreePointArc((-9.648158978, -25.872206112), (-5.01387655, -24.38645138), (-0.181296717, -23.811809838))
            ThreePointArc((-0.181296717, -23.811809838), (-5.38888745, -23.194720268), (-10.335130488, -21.452744208))
            ThreePointArc((-10.335130488, -21.452744208), (-13.6525, -23.64682365), (-13.411056221, -19.676857658))
            ThreePointArc((-13.411056221, -19.676857658), (-17.392773261, -16.264273564), (-20.530983871, -12.062912482))
            ThreePointArc((-20.530983871, -12.062912482), (-18.612348128, -16.535370154), (-17.581908256, -21.29165383))
            ThreePointArc((-17.581908256, -21.29165383), (-14.76375, -25.57156511), (-9.648158978, -25.872206112))
        make_face()
        with BuildLine():
            ThreePointArc((17.581908256, -21.29165383), (18.612348128, -16.535370154), (20.530983871, -12.062912482))
            ThreePointArc((20.530983871, -12.062912482), (17.39277326, -16.264273564), (13.411056221, -19.676857658))
            ThreePointArc((13.411056221, -19.676857658), (13.6525, -23.64682365), (10.335130488, -21.452744208))
            ThreePointArc((10.335130488, -21.452744208), (5.212138018, -23.235076362), (-0.181296717, -23.811809838))
            ThreePointArc((-0.181296717, -23.811809838), (4.837563965, -24.35161844), (9.650569001, -25.873242043))
            ThreePointArc((9.650569001, -25.873242043), (14.764885819, -25.570909171), (17.581908256, -21.29165383))
        make_face()
        with BuildLine():
            ThreePointArc((27.230067234, 4.580552281), (23.626224678, 7.851081226), (20.712280588, 11.748897356))
            ThreePointArc((20.712280588, 11.748897356), (22.781660711, 6.930446704), (23.746186709, 1.77588655))
            ThreePointArc((23.746186709, 1.77588655), (27.305, 0), (23.746186709, -1.77588655))
            ThreePointArc((23.746186709, -1.77588655), (22.728235397, -7.103694249), (20.530983871, -12.062912482))
            ThreePointArc((20.530983871, -12.062912482), (23.507902174, -7.986355934), (27.232169388, -4.578983105))
            ThreePointArc((27.232169388, -4.578983105), (29.527499849, 0.001311618), (27.230067234, 4.580552281))
        make_face()
        with BuildLine():
            ThreePointArc((9.648158978, 25.872206112), (5.01387655, 24.38645138), (0.181296717, 23.811809838))
            ThreePointArc((0.181296717, 23.811809838), (5.38888745, 23.194720268), (10.335130488, 21.452744208))
            ThreePointArc((10.335130488, 21.452744208), (13.6525, 23.64682365), (13.411056221, 19.676857658))
            ThreePointArc((13.411056221, 19.676857658), (17.516097379, 16.131382113), (20.712280588, 11.748897356))
            ThreePointArc((20.712280588, 11.748897356), (18.67033821, 16.365262506), (17.581600387, 21.294258937))
            ThreePointArc((17.581600387, 21.294258937), (14.762614031, 25.572220789), (9.648158978, 25.872206112))
        make_face()
    extrude(amount=CIRPATTERN3_2_DEPTH)


solid = part.part
